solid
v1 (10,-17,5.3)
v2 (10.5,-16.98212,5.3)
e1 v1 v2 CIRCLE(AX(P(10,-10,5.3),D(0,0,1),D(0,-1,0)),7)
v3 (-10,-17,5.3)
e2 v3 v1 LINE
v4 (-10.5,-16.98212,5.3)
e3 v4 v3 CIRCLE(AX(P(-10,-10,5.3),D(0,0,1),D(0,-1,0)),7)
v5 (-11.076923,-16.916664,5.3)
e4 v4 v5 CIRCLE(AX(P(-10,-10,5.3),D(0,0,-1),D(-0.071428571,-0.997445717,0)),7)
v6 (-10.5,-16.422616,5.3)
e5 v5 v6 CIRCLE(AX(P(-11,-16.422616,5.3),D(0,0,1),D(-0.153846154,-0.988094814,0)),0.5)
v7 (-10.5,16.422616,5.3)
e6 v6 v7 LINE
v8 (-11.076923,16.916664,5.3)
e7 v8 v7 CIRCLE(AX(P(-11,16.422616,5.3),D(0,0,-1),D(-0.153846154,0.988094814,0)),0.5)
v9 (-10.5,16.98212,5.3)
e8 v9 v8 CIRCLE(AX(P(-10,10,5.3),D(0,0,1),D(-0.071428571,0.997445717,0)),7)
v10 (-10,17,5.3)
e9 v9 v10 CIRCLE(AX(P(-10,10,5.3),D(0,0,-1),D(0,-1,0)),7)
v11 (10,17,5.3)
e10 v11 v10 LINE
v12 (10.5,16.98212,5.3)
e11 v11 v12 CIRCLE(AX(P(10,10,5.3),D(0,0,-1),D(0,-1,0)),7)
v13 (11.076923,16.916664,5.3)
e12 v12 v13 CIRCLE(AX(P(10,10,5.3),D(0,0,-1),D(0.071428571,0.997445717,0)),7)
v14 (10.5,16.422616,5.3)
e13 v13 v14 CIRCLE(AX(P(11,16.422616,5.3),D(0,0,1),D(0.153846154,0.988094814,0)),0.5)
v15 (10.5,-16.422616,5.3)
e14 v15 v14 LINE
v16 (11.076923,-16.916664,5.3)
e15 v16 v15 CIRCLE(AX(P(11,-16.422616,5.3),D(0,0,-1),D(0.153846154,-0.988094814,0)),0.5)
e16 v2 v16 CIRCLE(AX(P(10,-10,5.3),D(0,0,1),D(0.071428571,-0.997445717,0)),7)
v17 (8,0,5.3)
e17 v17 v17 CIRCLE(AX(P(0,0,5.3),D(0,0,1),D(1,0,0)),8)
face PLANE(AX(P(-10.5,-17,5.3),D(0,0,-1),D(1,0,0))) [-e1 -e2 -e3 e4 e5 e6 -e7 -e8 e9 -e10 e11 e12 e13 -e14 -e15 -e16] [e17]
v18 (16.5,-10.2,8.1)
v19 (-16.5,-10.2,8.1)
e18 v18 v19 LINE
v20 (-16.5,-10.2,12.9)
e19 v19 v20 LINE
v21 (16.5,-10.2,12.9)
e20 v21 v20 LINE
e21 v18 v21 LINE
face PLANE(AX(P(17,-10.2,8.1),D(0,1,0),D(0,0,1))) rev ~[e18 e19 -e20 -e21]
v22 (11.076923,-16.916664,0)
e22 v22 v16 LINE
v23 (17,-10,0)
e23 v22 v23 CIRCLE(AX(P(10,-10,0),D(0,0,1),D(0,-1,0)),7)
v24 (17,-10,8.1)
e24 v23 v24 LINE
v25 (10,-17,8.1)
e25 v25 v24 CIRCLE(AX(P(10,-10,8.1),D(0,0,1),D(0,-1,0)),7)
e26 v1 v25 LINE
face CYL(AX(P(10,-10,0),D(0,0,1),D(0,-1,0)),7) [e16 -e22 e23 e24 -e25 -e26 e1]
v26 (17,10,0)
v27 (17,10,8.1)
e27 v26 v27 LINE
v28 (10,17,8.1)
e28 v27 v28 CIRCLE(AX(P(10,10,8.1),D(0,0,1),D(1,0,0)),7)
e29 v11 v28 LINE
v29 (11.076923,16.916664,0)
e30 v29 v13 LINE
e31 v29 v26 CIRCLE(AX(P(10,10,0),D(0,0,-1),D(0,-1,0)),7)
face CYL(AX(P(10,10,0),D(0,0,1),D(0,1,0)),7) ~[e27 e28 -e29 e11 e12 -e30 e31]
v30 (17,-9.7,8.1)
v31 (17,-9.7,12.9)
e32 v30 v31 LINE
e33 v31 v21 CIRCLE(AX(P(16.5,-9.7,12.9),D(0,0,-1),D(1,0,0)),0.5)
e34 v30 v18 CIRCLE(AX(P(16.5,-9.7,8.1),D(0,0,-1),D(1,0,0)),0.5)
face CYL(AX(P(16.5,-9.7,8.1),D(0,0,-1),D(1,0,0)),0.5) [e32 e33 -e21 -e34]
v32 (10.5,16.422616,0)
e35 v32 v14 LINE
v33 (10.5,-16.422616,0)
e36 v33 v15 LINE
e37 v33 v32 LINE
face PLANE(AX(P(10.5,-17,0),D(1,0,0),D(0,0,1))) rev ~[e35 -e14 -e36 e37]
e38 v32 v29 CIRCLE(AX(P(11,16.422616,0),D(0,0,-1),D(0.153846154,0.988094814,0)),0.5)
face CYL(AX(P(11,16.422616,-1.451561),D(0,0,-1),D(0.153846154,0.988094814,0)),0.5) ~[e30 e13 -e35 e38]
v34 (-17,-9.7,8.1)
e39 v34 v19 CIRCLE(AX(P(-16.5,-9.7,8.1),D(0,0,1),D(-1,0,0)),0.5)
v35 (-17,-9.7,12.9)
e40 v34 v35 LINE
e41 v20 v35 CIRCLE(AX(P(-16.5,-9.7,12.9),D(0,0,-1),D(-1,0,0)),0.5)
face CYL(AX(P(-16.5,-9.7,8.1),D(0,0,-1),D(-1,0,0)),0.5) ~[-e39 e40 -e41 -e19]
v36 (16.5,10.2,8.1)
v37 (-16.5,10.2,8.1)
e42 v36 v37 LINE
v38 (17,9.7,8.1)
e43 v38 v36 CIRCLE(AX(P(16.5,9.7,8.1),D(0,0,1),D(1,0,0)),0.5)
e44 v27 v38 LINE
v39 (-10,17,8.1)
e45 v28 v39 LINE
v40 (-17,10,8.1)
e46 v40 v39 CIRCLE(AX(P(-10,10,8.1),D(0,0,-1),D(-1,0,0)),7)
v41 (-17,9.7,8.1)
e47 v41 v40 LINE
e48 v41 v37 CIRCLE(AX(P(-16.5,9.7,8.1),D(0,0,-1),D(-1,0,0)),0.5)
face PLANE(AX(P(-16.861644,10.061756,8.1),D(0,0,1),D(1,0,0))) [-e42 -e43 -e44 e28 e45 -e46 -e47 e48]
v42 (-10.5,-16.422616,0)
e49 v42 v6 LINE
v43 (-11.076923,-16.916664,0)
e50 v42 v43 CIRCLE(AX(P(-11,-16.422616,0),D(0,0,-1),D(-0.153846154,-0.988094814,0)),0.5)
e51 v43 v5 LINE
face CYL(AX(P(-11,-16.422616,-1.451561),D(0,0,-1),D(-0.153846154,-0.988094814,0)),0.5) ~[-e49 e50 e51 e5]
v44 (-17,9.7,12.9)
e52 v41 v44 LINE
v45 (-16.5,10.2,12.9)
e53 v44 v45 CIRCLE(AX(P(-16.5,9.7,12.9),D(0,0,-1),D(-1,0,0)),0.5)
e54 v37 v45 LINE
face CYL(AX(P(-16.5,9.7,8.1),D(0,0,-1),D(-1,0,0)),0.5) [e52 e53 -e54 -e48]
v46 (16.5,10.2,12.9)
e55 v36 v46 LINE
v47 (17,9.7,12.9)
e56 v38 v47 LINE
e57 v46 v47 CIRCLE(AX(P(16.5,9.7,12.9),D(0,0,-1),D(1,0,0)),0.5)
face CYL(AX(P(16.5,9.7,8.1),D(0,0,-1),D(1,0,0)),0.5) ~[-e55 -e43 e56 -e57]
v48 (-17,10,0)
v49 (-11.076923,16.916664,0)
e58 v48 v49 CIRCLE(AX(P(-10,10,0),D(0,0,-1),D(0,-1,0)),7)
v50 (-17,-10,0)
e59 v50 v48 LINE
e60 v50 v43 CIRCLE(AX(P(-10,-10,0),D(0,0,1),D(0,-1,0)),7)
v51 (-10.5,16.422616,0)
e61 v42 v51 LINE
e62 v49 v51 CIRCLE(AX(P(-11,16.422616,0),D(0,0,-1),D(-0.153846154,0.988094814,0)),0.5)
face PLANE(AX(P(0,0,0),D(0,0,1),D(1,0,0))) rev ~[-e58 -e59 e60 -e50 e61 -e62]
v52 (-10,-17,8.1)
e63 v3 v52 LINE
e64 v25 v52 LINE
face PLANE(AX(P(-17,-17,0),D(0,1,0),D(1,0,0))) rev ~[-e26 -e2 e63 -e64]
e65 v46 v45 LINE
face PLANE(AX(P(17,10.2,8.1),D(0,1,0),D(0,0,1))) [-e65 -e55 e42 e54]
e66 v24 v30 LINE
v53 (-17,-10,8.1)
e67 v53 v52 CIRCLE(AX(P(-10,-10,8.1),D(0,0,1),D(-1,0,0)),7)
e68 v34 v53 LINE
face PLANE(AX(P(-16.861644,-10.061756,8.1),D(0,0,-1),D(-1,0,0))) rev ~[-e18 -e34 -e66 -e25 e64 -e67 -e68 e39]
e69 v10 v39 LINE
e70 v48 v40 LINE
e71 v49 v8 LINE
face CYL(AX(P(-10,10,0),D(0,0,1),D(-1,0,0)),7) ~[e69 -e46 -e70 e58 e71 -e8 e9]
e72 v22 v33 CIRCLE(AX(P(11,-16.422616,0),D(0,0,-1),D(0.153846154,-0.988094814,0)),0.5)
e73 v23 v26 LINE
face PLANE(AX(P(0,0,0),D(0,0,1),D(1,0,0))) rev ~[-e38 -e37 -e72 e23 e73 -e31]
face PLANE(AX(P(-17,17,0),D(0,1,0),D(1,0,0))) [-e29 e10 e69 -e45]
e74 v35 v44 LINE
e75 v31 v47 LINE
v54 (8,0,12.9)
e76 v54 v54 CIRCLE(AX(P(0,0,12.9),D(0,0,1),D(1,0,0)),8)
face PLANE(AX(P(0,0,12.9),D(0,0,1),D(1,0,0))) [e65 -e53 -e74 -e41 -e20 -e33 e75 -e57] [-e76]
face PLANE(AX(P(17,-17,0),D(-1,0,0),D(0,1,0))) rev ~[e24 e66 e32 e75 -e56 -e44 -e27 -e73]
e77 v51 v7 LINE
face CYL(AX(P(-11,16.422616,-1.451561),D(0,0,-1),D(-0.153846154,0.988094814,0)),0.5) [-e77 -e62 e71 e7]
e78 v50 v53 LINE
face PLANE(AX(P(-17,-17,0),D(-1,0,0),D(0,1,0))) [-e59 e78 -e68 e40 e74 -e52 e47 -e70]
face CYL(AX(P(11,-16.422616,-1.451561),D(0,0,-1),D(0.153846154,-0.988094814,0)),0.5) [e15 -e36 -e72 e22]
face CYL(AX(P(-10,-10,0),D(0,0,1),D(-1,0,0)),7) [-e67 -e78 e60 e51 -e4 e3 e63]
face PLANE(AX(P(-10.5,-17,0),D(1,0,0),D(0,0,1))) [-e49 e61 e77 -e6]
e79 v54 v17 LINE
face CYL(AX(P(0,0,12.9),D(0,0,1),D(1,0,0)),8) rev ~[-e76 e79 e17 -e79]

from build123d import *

# Parameters (mm, degrees)
F0_W        = 34
F0_H        = 34
F1_DEPTH    = 12.9
F2_W        = 21
F2_H        = 5.3
F3_DEPTH    = 34.001
F4_W        = 6.8
F4_H        = 4.8
F5_DEPTH    = 34.001
F6_R        = 8
F7_DEPTH    = 12.901
F8_R        = 7
F9_T1_DEPTH = 6.0500204163
F9_T3_DEPTH = 6.751561158


# Not quite as in the source:
# - a fillet or chamfer that OpenCascade refuses, or shapes differently, is made with other operations: its cross-section is extruded or revolved along the edge and cut away or added


with BuildPart() as f1:
    # F0 (on Top) → F1 (new body)
    with BuildSketch(Plane.XY):
        Rectangle(F0_W, F0_H)
    extrude(amount=F1_DEPTH)

    # F2 (on face) → F3 (cut, through all)
    with BuildSketch(Plane.XZ.offset(17)):
        with Locations((0, 2.65)):
            Rectangle(F2_W, F2_H)
    extrude(amount=-F3_DEPTH, mode=Mode.SUBTRACT)

    # F4 (on face) → F5 (cut, through all)
    with BuildSketch(Plane.YZ.offset(17)):
        with Locations((-13.6, 10.5)):
            Rectangle(F4_W, F4_H)
        with Locations((13.6, 10.5)):
            Rectangle(F4_W, F4_H)
    extrude(amount=-F5_DEPTH, mode=Mode.SUBTRACT)

    # F6 (on face) → F7 (cut, through all)
    with BuildSketch(Plane.XY.offset(12.9)):
        Circle(F6_R)
    extrude(amount=-F7_DEPTH, mode=Mode.SUBTRACT)

    # F8
    f8_edges = [f1.edges().sort_by_distance(p)[0] for p in [
        (17, -17, 4.05),
        (17, 17, 4.05),
        (-17, -17, 4.05),
        (-17, 17, 4.05),
    ]]
    fillet(f8_edges, radius=F8_R)

    # F9: fillet of radius 0.5 on 8 edges, made by hand

    # F9_s2 → F9_t1 (cut)
    with BuildSketch(Plane.XY.offset(8.1)):
        with BuildLine():
            ThreePointArc((17, -9.7), (16.8535533906, -10.0535533906), (16.5, -10.2))
            Line((16.5, -10.2), (16.5, -10.25))
            Line((16.5, -10.25), (16.9971422738, -10.25))
            Line((16.9971422738, -10.25), (17.0471218615, -10.2014285714))
            ThreePointArc((17.0471218615, -10.2014285714), (17.05, -10), (17.05, -9.7))
            Line((17.05, -9.7), (17, -9.7))
        make_face()
        with BuildLine():
            ThreePointArc((17, 9.7), (16.8535533906, 10.0535533906), (16.5, 10.2))
            Line((16.5, 10.2), (16.5, 10.25))
            Line((16.5, 10.25), (16.9971422738, 10.25))
            Line((16.9971422738, 10.25), (17.0471218615, 10.2014285714))
            ThreePointArc((17.0471218615, 10.2014285714), (17.05, 10), (17.05, 9.7))
            Line((17.05, 9.7), (17, 9.7))
        make_face()
        with BuildLine():
            ThreePointArc((-17, 9.7), (-16.8535533906, 10.0535533906), (-16.5, 10.2))
            Line((-16.5, 10.2), (-16.5, 10.25))
            Line((-16.5, 10.25), (-16.9971422738, 10.25))
            Line((-16.9971422738, 10.25), (-17.0471218615, 10.2014285714))
            ThreePointArc((-17.0471218615, 10.2014285714), (-17.05, 10), (-17.05, 9.7))
            Line((-17.05, 9.7), (-17, 9.7))
        make_face()
        with BuildLine():
            ThreePointArc((-17, -9.7), (-16.8535533906, -10.0535533906), (-16.5, -10.2))
            Line((-16.5, -10.2), (-16.5, -10.25))
            Line((-16.5, -10.25), (-16.9971422738, -10.25))
            Line((-16.9971422738, -10.25), (-17.0471218615, -10.2014285714))
            ThreePointArc((-17.0471218615, -10.2014285714), (-17.05, -10), (-17.05, -9.7))
            Line((-17.05, -9.7), (-17, -9.7))
        make_face()
    extrude(amount=F9_T1_DEPTH, mode=Mode.SUBTRACT)

    # F9_s4 → F9_t3 (cut)
    with BuildSketch(Plane.XY.offset(-1.451561158)):
        with BuildLine():
            ThreePointArc((11.0769230769, -16.9166636962), (10.6747781822, -16.802393552), (10.5, -16.4226162893))
            Line((10.5, -16.4226162893), (10.5, -16.9821200219))
            ThreePointArc((10.5, -16.9821200219), (10.789140501, -16.9553761415), (11.0769230769, -16.9166636962))
        make_face()
        with BuildLine():
            ThreePointArc((-11.0769230769, -16.9166636962), (-10.6747781822, -16.802393552), (-10.5, -16.4226162893))
            Line((-10.5, -16.4226162893), (-10.5, -16.9821200219))
            ThreePointArc((-10.5, -16.9821200219), (-10.789140501, -16.9553761415), (-11.0769230769, -16.9166636962))
        make_face()
        with BuildLine():
            ThreePointArc((-11.0769230769, 16.9166636962), (-10.6747781822, 16.802393552), (-10.5, 16.4226162893))
            Line((-10.5, 16.4226162893), (-10.5, 16.9821200219))
            ThreePointArc((-10.5, 16.9821200219), (-10.789140501, 16.9553761415), (-11.0769230769, 16.9166636962))
        make_face()
        with BuildLine():
            ThreePointArc((11.0769230769, 16.9166636962), (10.6747781822, 16.802393552), (10.5, 16.4226162893))
            Line((10.5, 16.4226162893), (10.5, 16.9821200219))
            ThreePointArc((10.5, 16.9821200219), (10.789140501, 16.9553761415), (11.0769230769, 16.9166636962))
        make_face()
    extrude(amount=F9_T3_DEPTH, mode=Mode.SUBTRACT)


solid = f1.part
